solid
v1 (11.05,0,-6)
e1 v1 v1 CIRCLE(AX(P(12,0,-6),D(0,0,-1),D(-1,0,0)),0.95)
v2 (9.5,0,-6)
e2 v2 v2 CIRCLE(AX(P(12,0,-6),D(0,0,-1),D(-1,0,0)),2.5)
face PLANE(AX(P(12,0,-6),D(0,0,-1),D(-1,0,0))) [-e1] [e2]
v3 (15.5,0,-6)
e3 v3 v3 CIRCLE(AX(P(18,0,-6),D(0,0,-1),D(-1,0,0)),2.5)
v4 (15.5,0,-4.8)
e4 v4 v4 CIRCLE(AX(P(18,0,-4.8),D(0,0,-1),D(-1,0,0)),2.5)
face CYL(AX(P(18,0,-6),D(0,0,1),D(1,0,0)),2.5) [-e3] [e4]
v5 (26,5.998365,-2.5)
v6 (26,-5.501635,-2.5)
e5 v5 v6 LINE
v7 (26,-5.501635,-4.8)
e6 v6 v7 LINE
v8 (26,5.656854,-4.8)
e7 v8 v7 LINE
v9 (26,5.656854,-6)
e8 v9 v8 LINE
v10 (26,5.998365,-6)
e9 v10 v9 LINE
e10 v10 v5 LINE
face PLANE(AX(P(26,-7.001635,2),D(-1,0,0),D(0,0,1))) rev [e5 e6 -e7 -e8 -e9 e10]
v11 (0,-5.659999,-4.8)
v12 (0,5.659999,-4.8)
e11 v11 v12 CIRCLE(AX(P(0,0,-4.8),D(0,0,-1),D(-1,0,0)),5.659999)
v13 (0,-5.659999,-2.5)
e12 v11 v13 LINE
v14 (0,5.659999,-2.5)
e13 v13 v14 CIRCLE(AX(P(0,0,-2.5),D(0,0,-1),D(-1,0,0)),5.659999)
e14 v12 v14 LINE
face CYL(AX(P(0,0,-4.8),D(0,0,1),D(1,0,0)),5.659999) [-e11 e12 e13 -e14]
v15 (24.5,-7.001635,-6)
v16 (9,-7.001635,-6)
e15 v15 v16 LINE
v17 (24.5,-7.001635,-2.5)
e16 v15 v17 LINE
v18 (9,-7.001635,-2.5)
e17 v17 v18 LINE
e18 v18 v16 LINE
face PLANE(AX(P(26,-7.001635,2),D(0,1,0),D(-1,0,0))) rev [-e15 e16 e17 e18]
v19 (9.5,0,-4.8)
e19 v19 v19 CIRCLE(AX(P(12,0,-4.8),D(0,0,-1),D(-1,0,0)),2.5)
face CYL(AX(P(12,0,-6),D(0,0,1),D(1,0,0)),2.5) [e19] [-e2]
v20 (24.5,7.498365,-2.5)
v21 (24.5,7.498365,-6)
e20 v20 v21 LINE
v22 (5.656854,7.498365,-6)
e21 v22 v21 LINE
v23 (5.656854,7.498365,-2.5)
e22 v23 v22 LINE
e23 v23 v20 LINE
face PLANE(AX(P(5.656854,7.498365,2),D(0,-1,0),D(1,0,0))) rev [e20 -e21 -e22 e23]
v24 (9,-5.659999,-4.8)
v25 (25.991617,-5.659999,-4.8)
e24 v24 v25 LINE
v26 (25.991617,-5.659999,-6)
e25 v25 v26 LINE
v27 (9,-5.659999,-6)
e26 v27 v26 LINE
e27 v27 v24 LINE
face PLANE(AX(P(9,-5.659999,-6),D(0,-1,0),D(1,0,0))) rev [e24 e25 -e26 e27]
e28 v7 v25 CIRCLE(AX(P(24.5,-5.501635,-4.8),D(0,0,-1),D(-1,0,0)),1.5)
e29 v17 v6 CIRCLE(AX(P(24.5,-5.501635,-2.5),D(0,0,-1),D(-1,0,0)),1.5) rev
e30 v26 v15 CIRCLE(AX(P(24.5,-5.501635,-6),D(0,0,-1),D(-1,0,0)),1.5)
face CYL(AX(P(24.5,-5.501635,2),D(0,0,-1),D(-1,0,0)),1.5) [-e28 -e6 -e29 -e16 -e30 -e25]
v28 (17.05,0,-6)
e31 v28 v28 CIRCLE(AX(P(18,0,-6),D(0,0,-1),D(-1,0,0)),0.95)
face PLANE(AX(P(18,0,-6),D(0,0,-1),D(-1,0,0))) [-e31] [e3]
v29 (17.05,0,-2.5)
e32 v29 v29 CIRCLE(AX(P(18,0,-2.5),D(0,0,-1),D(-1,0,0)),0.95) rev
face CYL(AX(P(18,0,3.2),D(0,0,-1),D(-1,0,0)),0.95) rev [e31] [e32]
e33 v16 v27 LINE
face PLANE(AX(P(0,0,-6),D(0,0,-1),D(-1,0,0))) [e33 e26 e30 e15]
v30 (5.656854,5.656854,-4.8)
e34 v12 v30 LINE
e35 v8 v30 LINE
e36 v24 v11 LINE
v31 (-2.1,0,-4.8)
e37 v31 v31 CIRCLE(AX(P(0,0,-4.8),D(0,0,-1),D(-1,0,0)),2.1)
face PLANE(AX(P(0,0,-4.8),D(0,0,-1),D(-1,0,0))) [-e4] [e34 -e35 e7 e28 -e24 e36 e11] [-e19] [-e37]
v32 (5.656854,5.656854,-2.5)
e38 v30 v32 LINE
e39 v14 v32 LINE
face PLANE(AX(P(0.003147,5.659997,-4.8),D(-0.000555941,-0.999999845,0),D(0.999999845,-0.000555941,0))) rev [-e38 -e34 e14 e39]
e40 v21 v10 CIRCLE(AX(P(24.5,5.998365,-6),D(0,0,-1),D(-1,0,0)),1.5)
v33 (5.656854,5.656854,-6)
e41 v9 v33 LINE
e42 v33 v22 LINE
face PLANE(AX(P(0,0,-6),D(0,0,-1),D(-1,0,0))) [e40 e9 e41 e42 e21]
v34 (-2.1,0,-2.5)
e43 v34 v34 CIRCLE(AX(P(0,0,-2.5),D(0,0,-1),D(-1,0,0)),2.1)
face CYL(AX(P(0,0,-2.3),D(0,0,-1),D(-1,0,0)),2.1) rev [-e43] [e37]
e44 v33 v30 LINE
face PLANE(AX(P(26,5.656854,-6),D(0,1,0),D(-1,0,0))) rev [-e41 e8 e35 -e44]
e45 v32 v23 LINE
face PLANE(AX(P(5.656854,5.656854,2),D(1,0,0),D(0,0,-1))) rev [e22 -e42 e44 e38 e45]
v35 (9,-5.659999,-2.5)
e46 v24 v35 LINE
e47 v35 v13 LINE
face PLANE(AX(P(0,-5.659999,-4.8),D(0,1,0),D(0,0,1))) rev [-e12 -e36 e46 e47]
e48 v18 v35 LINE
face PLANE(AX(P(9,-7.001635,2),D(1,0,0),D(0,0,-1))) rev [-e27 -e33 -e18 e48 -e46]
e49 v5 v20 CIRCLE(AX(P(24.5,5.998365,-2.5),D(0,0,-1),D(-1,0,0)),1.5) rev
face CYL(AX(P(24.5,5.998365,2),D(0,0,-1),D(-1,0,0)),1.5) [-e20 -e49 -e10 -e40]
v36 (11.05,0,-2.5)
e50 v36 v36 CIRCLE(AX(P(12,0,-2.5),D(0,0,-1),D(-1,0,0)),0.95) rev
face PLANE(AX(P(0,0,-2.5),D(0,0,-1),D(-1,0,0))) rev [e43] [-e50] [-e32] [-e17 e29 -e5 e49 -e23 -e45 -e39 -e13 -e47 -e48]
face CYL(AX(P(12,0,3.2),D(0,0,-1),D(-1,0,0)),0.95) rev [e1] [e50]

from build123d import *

# Parameters (mm, degrees)
BOSS_EXTRUDE1_DEPTH = 2
BOSS_EXTRUDE2_START = 2.5
BOSS_EXTRUDE2_DEPTH = 2.5
CUT_EXTRUDE1_DEPTH  = 2.5
BOSS_EXTRUDE3_DEPTH = 2.3
SKETCH9_R           = 2.1
CUT_EXTRUDE2_DEPTH  = 2.5
SKETCH10_R          = 2.5
BOSS_EXTRUDE4_DEPTH = 1.2
SKETCH11_R          = 0.95
CUT_EXTRUDE3_DEPTH  = 9.2
SKETCH12_R          = 2
CUT_EXTRUDE4_DEPTH  = 2.5
SKETCH14_W          = 20.343145751
SKETCH14_H          = 1.841510486
SKETCH14_W_2        = 17
SKETCH14_H_2        = 1.34163614
BOSS_EXTRUDE5_DEPTH = 1.2
FILLET1_R           = 1.5
SKETCH17_R          = 0.95
CUT_EXTRUDE5_DEPTH  = 3


# Read off the part's stored shape, not the designer's step: Boss-Extrude3
with BuildPart() as part:
    # Sketch5 → Boss-Extrude1 (new body)
    with BuildSketch(Plane.XY):
        with BuildLine():
            Line((8, 0), (9, -2.501635265))
            Line((9, -2.501635265), (9, -7.001635265))
            Line((9, -7.001635265), (26, -7.001635265))
            Line((26, -7.001635265), (26, 7.498364735))
            Line((26, 7.498364735), (5.656854249, 7.498364735))
            Line((5.656854249, 7.498364735), (5.656854249, 5.656854249))
            ThreePointArc((5.656854249, 5.656854249), (7.39103626, 3.061467459), (8, 0))
        make_face()
    extrude(amount=BOSS_EXTRUDE1_DEPTH)

    # Sketch6 → Boss-Extrude2 (add)
    with BuildSketch(Plane(origin=(0, 0, 0), x_dir=(-1, 0, 0), z_dir=(0, 0, -1)).offset(BOSS_EXTRUDE2_START)):
        with BuildLine():
            Line((-5.656854249, 7.498364735), (-5.656854249, 5.656854249))
            ThreePointArc((-5.656854249, 5.656854249), (-7.39103626, 3.061467459), (-8, 0))
            Line((-8, 0), (-9, -2.501635265))
            Line((-9, -2.501635265), (-9, -7.001635265))
            Line((-9, -7.001635265), (-26, -7.001635265))
            Line((-26, -7.001635265), (-26, 7.498364735))
            Line((-26, 7.498364735), (-5.656854249, 7.498364735))
        make_face()
    extrude(amount=-BOSS_EXTRUDE2_DEPTH)

    # Sketch7 → Cut-Extrude1 (cut)
    with BuildSketch(Plane(origin=(0, 0, -2.5), x_dir=(-1, 0, 0), z_dir=(0, 0, -1))):
        Polygon((-26, 5.298364735), (-2.738141148, 5.298364735), (-2.738141148, 3.998364735), (-29.849535112, 3.998364735), (-29.849535112, 5.298364735), align=None)
    extrude(amount=-CUT_EXTRUDE1_DEPTH, mode=Mode.SUBTRACT)

    # Boss-Extrude3 outline → Boss-Extrude3 (add)
    with BuildSketch(Plane(origin=(0, 0, -2.5), x_dir=(-1, 0, 0), z_dir=(0, 0, -1))):
        with BuildLine():
            Line((-9, -7.001635265), (-9, -5.659999125))
            Line((-9, -5.659999125), (0, -5.659998688))
            ThreePointArc((0, -5.659998688), (5.659998688, 0), (0, 5.659998688))
            Line((0, 5.659998688), (-5.656854249, 5.656854249))
            Line((-5.656854249, 5.656854249), (-5.656854249, 7.498364735))
            Line((-5.656854249, 7.498364735), (-26, 7.498364735))
            Line((-26, 7.498364735), (-26, -7.001635265))
            Line((-26, -7.001635265), (-9, -7.001635265))
        make_face()
    extrude(amount=BOSS_EXTRUDE3_DEPTH)

    # Sketch9 → Cut-Extrude2 (cut)
    with BuildSketch(Plane(origin=(0, 0, -4.8), x_dir=(-1, 0, 0), z_dir=(0, 0, -1))):
        Circle(SKETCH9_R)
    extrude(amount=-CUT_EXTRUDE2_DEPTH, mode=Mode.SUBTRACT)

    # Sketch10 → Boss-Extrude4 (add)
    with BuildSketch(Plane(origin=(0, 0, -4.8), x_dir=(-1, 0, 0), z_dir=(0, 0, -1))):
        with Locations((-12, 0)):
            Circle(SKETCH10_R)
        with Locations((-18, 0)):
            Circle(SKETCH10_R)
    extrude(amount=BOSS_EXTRUDE4_DEPTH)

    # Sketch11 → Cut-Extrude3 (cut)
    with BuildSketch(Plane(origin=(0, 0, -6), x_dir=(-1, 0, 0), z_dir=(0, 0, -1))):
        with Locations((-18, 0)):
            Circle(SKETCH11_R)
        with Locations((-12, 0)):
            Circle(SKETCH11_R)
    extrude(amount=-CUT_EXTRUDE3_DEPTH, mode=Mode.SUBTRACT)

    # Sketch12 → Cut-Extrude4 (cut)
    with BuildSketch(Plane.XY.offset(2)):
        with Locations((12, 0)):
            Circle(SKETCH12_R)
        with Locations((18, 0)):
            Circle(SKETCH12_R)
    extrude(amount=-CUT_EXTRUDE4_DEPTH, mode=Mode.SUBTRACT)

    # Sketch14 → Boss-Extrude5 (add)
    with BuildSketch(Plane(origin=(0, 0, -4.8), x_dir=(-1, 0, 0), z_dir=(0, 0, -1))):
        with Locations((-15.828427124, 6.577609492)):
            Rectangle(SKETCH14_W, SKETCH14_H)
        with Locations((-17.5, -6.330817195)):
            Rectangle(SKETCH14_W_2, SKETCH14_H_2)
    extrude(amount=BOSS_EXTRUDE5_DEPTH)

    # Fillet1
    # the kernel refuses this fillet: 1.5 mm, written as the material it takes off along each edge
    with BuildSketch(Plane(origin=(24.5, -5.501635265, 0.5), x_dir=(0, 0, 1), z_dir=(0, -1, 0))) as fillet1_piece_1_section:
        Polygon((0, 0), (FILLET1_R, 0), (FILLET1_R, -FILLET1_R), (0, -FILLET1_R), align=None)
    fillet1_piece_1 = extrude(amount=FILLET1_R, mode=Mode.PRIVATE)
    fillet1_piece_1 = fillet1_piece_1 - Plane(origin=(24.5, -5.501635265, 0.5), x_dir=(-0.7071067811865475, 0, -0.7071067811865475), z_dir=(0, -1, 0)) * Sphere(FILLET1_R, mode=Mode.PRIVATE)
    add(fillet1_piece_1, mode=Mode.SUBTRACT)
    with BuildSketch(Plane(origin=(24.5, 5.998364735, 0.5), x_dir=(0, 0, 1), z_dir=(0, 1, 0))) as fillet1_piece_2_section:
        Polygon((0, 0), (FILLET1_R, 0), (FILLET1_R, FILLET1_R), (0, FILLET1_R), align=None)
    fillet1_piece_2 = extrude(amount=FILLET1_R, mode=Mode.PRIVATE)
    fillet1_piece_2 = fillet1_piece_2 - Plane(origin=(24.5, 5.998364735, 0.5), x_dir=(-0.7071067811865475, 0, -0.7071067811865475), z_dir=(0, 1, 0)) * Sphere(FILLET1_R, mode=Mode.PRIVATE)
    add(fillet1_piece_2, mode=Mode.SUBTRACT)
    with BuildSketch(Plane(origin=(26, -5.501635265, 2), x_dir=(-1, 0, 0), z_dir=(0, 1, 0))) as fillet1_piece_3:
        with BuildLine():
            CenterArc((FILLET1_R, -FILLET1_R), FILLET1_R, 90, 90)
            Line((0, -FILLET1_R), (0, 0))
            Line((0, 0), (FILLET1_R, 0))
        make_face()
    extrude(amount=11.5, mode=Mode.SUBTRACT)
    with BuildSketch(Plane(origin=(26, -7.001635265, -2.5), x_dir=(-1, 0, 0), z_dir=(0, 0, 1))) as fillet1_piece_4:
        with BuildLine():
            CenterArc((FILLET1_R, -FILLET1_R), FILLET1_R, 90, 90)
            Line((0, -FILLET1_R), (0, 0))
            Line((0, 0), (FILLET1_R, 0))
        make_face()
    extrude(amount=3, mode=Mode.SUBTRACT)
    with BuildSketch(Plane(origin=(5.25, -7.001635265, 2), x_dir=(0, 1, 0), z_dir=(1, 0, 0))) as fillet1_piece_5:
        with BuildLine():
            CenterArc((FILLET1_R, -FILLET1_R), FILLET1_R, 90, 90)
            Line((0, -FILLET1_R), (0, 0))
            Line((0, 0), (FILLET1_R, 0))
        make_face()
    extrude(amount=19.25, mode=Mode.SUBTRACT)
    with BuildSketch(Plane(origin=(24.5, 7.498364735, 2), x_dir=(0, -1, 0), z_dir=(-1, 0, 0))) as fillet1_piece_6:
        with BuildLine():
            CenterArc((FILLET1_R, -FILLET1_R), FILLET1_R, 90, 90)
            Line((0, -FILLET1_R), (0, 0))
            Line((0, 0), (FILLET1_R, 0))
        make_face()
    extrude(amount=22.593145751, mode=Mode.SUBTRACT)
    with BuildSketch(Plane(origin=(26, 7.498364735, -2.5), x_dir=(-1, 0, 0), z_dir=(0, 0, 1))) as fillet1_piece_7:
        with BuildLine():
            CenterArc((FILLET1_R, FILLET1_R), FILLET1_R, 180, 90)
            Line((0, FILLET1_R), (0, 0))
            Line((0, 0), (FILLET1_R, 0))
        make_face()
    extrude(amount=3, mode=Mode.SUBTRACT)
    with BuildSketch(Plane(origin=(26, 7.498364735, -2.5), x_dir=(-1.0, -1.9174232572065026e-10, 0), z_dir=(0, 0, -1))) as fillet1_piece_8:
        with BuildLine():
            CenterArc((FILLET1_R, -FILLET1_R), FILLET1_R, 90.000000011, 90)
            Line((FILLET1_R * 1.9173522033e-10, -FILLET1_R), (0, 0))
            Line((0, 0), (FILLET1_R, 0))
        make_face()
    extrude(amount=2.3, mode=Mode.SUBTRACT)
    with BuildSketch(Plane(origin=(26, 7.498364735, -4.8), x_dir=(-1, 0, 0), z_dir=(0, 0, -1))) as fillet1_piece_9:
        with BuildLine():
            CenterArc((FILLET1_R, -FILLET1_R), FILLET1_R, 90, 90)
            Line((0, -FILLET1_R), (0, 0))
            Line((0, 0), (FILLET1_R, 0))
        make_face()
    extrude(amount=4.95, mode=Mode.SUBTRACT)
    with BuildSketch(Plane(origin=(26, -7.001635265, -2.5), x_dir=(-1.0, -1.9169850891861218e-10, 0), z_dir=(0, 0, -1))) as fillet1_piece_10:
        with BuildLine():
            CenterArc((FILLET1_R, FILLET1_R), FILLET1_R, 180.000000011, 90)
            Line((-FILLET1_R * 1.91707982785e-10, FILLET1_R), (0, 0))
            Line((0, 0), (FILLET1_R, 0))
        make_face()
    extrude(amount=2.3, mode=Mode.SUBTRACT)
    with BuildSketch(Plane(origin=(26, -7.001635265, -4.8), x_dir=(-1, 0, 0), z_dir=(0, 0, -1))) as fillet1_piece_11:
        with BuildLine():
            CenterArc((FILLET1_R, FILLET1_R), FILLET1_R, 180, 90)
            Line((0, FILLET1_R), (0, 0))
            Line((0, 0), (FILLET1_R, 0))
        make_face()
    extrude(amount=4.95, mode=Mode.SUBTRACT)

    # Sketch17 → Cut-Extrude5 (cut)
    with BuildSketch(Plane.XZ.offset(7.001635265)):
        with Locations((22, -1)):
            Circle(SKETCH17_R)
        with Locations((18, -1)):
            Circle(SKETCH17_R)
    extrude(amount=-CUT_EXTRUDE5_DEPTH, mode=Mode.SUBTRACT)


with BuildPart() as body_2:
    # Split1: the piece on the far side of the plane
    add(part.part)
    split(bisect_by=Plane(origin=(0, 0, -2.5), x_dir=(-1, 0, 0), z_dir=(0, 0, -1)), keep=Keep.BOTTOM)


with BuildPart() as part_1:
    add(part.part)

    # Split1
    split(bisect_by=Plane(origin=(0, 0, -2.5), x_dir=(-1, 0, 0), z_dir=(0, 0, -1)), keep=Keep.TOP)


solid = part_1.part
